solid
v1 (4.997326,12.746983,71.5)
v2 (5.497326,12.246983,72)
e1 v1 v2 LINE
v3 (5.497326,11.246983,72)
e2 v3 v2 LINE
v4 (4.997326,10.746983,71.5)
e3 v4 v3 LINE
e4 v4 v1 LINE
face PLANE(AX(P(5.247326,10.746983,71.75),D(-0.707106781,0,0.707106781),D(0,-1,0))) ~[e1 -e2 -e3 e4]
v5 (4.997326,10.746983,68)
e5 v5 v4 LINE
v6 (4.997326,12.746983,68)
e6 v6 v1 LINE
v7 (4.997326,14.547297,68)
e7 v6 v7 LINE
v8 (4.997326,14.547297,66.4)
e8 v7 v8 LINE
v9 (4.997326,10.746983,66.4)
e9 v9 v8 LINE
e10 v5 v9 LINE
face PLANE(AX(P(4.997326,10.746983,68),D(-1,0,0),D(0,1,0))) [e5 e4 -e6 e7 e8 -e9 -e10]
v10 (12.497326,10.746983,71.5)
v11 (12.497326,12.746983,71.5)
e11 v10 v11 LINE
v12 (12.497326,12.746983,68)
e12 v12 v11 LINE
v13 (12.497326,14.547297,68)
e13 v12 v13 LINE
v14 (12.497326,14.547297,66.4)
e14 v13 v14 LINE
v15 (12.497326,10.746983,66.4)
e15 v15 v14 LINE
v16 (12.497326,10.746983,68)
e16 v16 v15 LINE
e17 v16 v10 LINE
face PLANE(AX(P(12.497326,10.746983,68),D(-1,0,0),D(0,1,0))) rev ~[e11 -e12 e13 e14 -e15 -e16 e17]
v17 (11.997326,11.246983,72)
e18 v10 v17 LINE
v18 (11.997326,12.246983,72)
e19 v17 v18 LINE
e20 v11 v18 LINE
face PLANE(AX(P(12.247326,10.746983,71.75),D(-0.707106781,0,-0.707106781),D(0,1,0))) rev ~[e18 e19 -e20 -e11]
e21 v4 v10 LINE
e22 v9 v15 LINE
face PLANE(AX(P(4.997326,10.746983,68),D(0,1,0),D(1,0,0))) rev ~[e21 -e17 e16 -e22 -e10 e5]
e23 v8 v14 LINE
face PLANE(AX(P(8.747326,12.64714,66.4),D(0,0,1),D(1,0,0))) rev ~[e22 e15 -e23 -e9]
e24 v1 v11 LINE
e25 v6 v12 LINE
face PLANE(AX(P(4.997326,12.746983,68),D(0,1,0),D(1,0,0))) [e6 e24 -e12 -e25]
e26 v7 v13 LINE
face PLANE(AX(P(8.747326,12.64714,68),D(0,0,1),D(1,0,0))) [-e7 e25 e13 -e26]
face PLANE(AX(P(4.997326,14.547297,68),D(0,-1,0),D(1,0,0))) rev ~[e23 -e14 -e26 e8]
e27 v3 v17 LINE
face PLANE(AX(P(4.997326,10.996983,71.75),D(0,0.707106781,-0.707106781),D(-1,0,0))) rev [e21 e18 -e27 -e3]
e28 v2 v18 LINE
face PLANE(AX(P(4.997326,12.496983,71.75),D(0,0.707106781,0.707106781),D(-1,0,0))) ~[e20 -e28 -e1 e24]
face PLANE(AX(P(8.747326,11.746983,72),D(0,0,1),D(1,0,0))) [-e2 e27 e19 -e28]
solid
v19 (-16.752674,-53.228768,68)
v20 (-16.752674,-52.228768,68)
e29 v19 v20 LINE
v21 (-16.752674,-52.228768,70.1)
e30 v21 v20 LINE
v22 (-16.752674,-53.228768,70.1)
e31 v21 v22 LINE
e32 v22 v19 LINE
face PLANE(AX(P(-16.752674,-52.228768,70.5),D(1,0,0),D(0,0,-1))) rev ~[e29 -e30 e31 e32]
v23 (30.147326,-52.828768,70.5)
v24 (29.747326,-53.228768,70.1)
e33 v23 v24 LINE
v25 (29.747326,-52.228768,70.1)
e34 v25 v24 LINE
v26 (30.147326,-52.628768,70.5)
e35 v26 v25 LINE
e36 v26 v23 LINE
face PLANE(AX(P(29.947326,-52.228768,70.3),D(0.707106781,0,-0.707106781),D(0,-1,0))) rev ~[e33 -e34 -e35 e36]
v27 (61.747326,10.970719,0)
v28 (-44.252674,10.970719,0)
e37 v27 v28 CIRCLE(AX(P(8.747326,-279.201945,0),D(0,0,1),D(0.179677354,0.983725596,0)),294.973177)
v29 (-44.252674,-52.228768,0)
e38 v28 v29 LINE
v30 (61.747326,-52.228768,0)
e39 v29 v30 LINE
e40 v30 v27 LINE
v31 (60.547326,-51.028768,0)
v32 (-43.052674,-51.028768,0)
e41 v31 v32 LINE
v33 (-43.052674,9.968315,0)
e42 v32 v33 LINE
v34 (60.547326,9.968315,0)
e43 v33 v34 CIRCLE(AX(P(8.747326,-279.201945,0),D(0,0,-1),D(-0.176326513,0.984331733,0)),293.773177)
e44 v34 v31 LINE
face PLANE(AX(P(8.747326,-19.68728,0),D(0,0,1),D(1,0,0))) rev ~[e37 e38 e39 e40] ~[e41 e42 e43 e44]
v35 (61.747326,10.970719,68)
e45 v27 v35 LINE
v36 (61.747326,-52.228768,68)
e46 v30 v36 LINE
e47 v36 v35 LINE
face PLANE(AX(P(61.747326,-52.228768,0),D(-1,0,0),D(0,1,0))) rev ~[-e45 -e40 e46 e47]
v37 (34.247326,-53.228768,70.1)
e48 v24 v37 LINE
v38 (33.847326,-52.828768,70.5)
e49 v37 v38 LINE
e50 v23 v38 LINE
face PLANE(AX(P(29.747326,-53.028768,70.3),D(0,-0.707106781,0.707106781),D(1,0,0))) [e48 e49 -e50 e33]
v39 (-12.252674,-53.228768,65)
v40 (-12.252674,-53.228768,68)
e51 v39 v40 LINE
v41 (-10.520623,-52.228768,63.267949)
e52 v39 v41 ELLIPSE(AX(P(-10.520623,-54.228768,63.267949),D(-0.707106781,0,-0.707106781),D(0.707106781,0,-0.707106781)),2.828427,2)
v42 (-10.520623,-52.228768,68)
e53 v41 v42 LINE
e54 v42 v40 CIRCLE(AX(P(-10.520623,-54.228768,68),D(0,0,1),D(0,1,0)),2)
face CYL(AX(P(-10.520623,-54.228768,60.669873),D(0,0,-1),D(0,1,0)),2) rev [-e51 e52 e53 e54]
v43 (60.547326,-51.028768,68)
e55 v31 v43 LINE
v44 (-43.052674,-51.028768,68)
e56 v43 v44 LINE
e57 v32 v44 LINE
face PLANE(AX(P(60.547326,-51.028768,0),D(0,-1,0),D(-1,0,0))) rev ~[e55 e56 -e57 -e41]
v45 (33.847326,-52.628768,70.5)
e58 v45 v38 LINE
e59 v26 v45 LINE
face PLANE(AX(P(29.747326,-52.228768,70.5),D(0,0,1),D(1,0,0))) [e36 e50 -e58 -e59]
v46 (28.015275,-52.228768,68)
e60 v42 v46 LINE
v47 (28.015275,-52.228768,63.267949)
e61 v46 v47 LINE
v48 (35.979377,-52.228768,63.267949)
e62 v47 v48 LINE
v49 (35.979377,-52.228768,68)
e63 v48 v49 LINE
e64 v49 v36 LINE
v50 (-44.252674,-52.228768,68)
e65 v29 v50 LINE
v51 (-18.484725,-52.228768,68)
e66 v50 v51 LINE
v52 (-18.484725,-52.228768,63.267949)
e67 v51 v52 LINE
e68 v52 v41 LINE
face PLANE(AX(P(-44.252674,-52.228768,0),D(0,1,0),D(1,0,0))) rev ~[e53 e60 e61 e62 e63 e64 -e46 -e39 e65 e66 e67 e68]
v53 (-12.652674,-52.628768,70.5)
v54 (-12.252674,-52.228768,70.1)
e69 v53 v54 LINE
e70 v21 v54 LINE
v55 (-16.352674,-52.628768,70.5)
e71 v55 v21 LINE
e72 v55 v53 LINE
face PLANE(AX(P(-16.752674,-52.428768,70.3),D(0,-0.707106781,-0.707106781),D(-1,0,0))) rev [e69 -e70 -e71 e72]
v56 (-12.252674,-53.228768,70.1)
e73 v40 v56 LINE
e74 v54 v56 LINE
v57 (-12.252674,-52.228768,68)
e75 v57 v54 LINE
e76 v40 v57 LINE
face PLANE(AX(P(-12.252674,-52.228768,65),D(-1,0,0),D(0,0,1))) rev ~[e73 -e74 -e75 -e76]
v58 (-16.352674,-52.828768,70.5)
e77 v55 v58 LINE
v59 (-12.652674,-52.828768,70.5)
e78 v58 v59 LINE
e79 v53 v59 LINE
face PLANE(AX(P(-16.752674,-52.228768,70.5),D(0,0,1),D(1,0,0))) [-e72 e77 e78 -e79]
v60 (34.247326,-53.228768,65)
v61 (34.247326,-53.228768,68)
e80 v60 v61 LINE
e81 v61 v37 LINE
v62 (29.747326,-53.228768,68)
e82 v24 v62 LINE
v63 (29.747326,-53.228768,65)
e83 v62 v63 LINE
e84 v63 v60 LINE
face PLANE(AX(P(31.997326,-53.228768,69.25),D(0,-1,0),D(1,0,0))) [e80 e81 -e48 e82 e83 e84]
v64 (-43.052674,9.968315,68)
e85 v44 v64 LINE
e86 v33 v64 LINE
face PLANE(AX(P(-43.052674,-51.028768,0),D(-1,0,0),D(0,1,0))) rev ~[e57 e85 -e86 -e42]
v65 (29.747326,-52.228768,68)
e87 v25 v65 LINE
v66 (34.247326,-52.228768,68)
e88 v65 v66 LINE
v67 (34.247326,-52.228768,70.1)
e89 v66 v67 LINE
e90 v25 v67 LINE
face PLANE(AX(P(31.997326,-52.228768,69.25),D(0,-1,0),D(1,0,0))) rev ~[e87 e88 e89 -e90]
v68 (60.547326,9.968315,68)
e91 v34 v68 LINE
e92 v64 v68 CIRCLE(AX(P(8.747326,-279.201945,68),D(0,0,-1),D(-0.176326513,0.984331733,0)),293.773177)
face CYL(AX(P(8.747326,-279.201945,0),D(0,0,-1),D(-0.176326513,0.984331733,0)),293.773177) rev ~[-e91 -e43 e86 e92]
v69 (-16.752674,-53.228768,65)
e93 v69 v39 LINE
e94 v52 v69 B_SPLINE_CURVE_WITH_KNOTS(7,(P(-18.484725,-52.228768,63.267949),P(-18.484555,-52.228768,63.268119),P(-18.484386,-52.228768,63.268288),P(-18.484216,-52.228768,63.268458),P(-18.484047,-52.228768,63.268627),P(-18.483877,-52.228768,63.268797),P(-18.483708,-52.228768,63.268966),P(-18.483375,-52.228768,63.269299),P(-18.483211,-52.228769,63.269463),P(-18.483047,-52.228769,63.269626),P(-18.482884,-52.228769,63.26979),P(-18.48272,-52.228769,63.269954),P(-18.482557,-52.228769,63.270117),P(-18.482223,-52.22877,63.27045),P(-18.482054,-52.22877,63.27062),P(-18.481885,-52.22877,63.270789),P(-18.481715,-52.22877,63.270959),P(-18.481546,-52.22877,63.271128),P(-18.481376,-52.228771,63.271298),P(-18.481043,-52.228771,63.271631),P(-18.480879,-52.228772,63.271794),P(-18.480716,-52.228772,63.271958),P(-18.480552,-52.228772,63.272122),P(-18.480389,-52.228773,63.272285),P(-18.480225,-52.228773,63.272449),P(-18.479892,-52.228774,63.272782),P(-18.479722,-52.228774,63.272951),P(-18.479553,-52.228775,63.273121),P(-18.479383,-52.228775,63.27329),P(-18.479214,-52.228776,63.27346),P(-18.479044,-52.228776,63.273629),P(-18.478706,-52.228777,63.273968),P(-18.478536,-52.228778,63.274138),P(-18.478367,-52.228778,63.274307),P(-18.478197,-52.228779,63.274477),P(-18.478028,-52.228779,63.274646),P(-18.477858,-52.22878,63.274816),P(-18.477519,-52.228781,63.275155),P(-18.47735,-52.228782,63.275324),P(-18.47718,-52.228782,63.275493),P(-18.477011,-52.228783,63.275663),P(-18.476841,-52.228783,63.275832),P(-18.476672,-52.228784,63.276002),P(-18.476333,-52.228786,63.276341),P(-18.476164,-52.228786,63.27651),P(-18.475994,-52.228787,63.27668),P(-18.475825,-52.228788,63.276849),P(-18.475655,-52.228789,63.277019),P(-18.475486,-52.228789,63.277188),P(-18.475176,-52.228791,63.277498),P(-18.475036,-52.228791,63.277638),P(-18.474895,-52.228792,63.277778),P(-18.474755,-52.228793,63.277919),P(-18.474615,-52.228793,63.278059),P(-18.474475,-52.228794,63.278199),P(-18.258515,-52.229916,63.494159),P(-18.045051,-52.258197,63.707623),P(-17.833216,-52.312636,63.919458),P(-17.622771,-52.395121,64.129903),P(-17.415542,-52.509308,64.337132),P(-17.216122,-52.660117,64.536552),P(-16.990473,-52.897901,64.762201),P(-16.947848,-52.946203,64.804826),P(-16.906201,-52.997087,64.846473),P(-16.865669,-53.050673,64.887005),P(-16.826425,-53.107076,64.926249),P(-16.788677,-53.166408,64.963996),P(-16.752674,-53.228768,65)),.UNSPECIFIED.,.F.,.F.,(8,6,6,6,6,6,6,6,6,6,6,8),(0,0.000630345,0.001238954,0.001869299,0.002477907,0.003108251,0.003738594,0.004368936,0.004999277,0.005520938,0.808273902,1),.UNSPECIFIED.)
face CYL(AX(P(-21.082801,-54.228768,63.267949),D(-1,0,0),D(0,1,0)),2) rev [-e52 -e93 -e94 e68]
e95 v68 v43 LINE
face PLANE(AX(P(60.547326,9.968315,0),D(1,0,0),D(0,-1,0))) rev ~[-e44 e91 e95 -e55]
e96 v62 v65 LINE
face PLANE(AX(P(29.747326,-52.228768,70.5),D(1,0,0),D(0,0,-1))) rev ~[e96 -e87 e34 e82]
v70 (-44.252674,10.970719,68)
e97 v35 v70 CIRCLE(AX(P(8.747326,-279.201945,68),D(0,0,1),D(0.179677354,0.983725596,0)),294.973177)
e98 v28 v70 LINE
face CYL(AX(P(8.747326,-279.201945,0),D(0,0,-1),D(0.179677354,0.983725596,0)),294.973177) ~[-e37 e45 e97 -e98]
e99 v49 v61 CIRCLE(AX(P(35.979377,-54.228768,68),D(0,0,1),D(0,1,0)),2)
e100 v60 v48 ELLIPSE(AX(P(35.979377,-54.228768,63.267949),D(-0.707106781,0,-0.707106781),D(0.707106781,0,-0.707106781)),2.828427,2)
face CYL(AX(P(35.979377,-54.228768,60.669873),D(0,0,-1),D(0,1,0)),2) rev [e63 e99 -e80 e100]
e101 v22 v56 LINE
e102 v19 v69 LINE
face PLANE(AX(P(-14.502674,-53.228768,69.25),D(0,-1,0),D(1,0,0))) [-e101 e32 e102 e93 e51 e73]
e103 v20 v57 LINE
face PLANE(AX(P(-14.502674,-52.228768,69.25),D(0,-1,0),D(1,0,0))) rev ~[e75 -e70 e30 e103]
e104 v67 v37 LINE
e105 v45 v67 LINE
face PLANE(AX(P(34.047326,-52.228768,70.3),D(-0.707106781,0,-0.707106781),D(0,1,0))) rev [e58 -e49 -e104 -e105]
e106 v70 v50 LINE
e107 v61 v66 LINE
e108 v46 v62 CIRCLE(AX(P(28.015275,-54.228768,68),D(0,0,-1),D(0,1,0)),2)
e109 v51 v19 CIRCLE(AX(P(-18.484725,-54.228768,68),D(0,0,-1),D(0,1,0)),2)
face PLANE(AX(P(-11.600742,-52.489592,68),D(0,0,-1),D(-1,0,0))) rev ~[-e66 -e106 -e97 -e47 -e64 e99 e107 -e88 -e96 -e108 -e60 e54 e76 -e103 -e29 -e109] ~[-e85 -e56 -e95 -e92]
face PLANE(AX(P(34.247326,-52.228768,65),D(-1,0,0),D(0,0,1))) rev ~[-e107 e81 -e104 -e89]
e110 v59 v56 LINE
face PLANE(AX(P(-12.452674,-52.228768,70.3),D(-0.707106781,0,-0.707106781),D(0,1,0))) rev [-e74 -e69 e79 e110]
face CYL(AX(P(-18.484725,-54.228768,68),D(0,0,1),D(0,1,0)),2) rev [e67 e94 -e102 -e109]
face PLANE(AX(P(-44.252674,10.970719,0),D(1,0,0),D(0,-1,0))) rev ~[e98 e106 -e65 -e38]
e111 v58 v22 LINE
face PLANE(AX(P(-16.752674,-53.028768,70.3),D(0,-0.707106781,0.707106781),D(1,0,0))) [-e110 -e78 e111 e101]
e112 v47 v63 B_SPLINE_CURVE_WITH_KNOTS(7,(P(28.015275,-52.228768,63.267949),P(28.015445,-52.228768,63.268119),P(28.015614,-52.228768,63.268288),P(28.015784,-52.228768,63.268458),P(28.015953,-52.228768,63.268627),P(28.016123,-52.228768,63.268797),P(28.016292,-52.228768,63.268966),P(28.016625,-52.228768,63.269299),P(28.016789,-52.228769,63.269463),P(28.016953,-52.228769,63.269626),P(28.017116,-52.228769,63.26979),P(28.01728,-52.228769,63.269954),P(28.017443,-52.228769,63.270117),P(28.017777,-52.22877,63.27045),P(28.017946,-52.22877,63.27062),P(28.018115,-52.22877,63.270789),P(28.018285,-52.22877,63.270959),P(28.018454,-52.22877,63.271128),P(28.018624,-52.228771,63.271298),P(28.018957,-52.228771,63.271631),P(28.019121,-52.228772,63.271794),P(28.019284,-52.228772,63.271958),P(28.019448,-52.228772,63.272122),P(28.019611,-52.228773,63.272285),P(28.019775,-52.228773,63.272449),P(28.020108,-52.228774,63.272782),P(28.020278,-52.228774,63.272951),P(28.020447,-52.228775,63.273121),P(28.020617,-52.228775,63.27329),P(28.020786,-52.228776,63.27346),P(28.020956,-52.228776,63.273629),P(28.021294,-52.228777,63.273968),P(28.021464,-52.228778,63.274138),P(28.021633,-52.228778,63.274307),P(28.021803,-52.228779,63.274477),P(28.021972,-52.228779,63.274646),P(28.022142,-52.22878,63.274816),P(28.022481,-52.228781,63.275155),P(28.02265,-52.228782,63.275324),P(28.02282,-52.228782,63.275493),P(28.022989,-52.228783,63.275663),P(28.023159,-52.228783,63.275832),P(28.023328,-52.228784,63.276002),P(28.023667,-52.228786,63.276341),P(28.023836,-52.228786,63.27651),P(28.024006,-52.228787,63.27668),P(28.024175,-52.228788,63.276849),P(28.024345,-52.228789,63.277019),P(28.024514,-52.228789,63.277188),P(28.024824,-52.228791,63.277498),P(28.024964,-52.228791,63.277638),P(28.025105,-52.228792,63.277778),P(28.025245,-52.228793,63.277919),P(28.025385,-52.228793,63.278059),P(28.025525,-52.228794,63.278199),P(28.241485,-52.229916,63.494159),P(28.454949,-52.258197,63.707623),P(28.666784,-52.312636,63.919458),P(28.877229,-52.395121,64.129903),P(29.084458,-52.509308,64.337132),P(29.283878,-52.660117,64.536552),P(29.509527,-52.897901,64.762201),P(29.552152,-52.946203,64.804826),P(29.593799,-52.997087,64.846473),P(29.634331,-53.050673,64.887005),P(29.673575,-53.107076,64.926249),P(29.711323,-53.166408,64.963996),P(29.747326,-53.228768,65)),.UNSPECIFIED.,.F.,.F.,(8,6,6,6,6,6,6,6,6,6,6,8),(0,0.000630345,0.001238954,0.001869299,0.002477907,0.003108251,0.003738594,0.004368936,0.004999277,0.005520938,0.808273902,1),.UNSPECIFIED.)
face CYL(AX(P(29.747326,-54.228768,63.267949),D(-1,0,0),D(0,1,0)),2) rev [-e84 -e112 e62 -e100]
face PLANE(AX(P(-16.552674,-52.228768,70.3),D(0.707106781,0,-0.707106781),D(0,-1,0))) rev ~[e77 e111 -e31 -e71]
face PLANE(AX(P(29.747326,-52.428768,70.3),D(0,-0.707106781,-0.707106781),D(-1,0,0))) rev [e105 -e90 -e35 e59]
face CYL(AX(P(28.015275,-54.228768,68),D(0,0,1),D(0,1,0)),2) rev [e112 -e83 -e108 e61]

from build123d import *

# Parameters (mm, degrees)
F1_DEPTH     = 68
F2_W         = 4.5
F2_H         = 2.5
F2_H_2       = 3
F3_DEPTH     = 1
F4_T1_DEPTH  = 3
F4_T3_DEPTH  = 4.5
F4_T5_DEPTH  = 4.5
F4_T11_DEPTH = 7.3301270189
F4_T15_DEPTH = 8.8301270189
F4_T22_DEPTH = 8.8301270189
F4_T26_DEPTH = 7.3301270189
F4_T33_DEPTH = 8.8301270189
F4_T37_DEPTH = 7.3301270189
F4_T44_DEPTH = 7.3301270189
F4_T48_DEPTH = 8.8301270189
F5_W         = 7.5
F5_H         = 3.8003136895
F6_DEPTH     = 1.6
F7_W         = 7.5
F7_H         = 2
F8_DEPTH     = 4
F9_SIZE      = 0.5
F10_SIZE     = 0.4


# Not quite as in the source:
# - a fillet or chamfer that OpenCascade refuses, or shapes differently, is made with other operations: its cross-section is extruded or revolved along the edge and cut away or added


with BuildPart() as f1:
    # F0 (on Top) → F1 (new body)
    with BuildSketch(Plane.XY):
        with BuildLine():
            ThreePointArc((61.7473262101, 10.9707194196), (8.7473262101, 15.7712320468), (-44.2526737899, 10.9707194196))
            Line((-44.2526737899, 10.9707194196), (-44.2526737899, -52.2287679532))
            Line((-44.2526737899, -52.2287679532), (61.7473262101, -52.2287679532))
            Line((61.7473262101, -52.2287679532), (61.7473262101, 10.9707194196))
        make_face()
        with BuildLine():
            ThreePointArc((-43.0526737899, 9.9683154894), (8.7473262101, 14.5712320468), (60.5473262101, 9.9683154894))
            Line((60.5473262101, 9.9683154894), (60.5473262101, -51.0287679532))
            Line((60.5473262101, -51.0287679532), (-43.0526737899, -51.0287679532))
            Line((-43.0526737899, -51.0287679532), (-43.0526737899, 9.9683154894))
        make_face(mode=Mode.SUBTRACT)
    extrude(amount=F1_DEPTH)

    # F2 (on face) → F3 (join)
    with BuildSketch(Plane.XZ.offset(52.2287679532)):
        with Locations((-14.5026737899, 69.25)):
            Rectangle(F2_W, F2_H)
        with Locations((31.9973262101, 69.25)):
            Rectangle(F2_W, F2_H)
        with Locations((-14.5026737899, 66.5)):
            Rectangle(F2_W, F2_H_2)
        with Locations((31.9973262101, 66.5)):
            Rectangle(F2_W, F2_H_2)
    extrude(amount=F3_DEPTH)

    # F4: fillet of radius 2 on 6 edges, made by hand

    # F4_s2 → F4_t1 (join)
    with BuildSketch(Plane.XY.offset(65)):
        with BuildLine():
            ThreePointArc((-10.5206229823, -52.2287679532), (-11.5206229823, -52.4967171456), (-12.2526737899, -53.2287679532))
            Line((-12.2526737899, -53.2287679532), (-12.2526737899, -52.2287679532))
            Line((-12.2526737899, -52.2287679532), (-10.5206229823, -52.2287679532))
        make_face()
        with BuildLine():
            ThreePointArc((-18.4847245974, -52.2287679532), (-17.4847245974, -52.4967171456), (-16.7526737899, -53.2287679532))
            Line((-16.7526737899, -53.2287679532), (-16.7526737899, -52.2287679532))
            Line((-16.7526737899, -52.2287679532), (-18.4847245974, -52.2287679532))
        make_face()
        with BuildLine():
            ThreePointArc((28.0152754026, -52.2287679532), (29.0152754026, -52.4967171456), (29.7473262101, -53.2287679532))
            Line((29.7473262101, -53.2287679532), (29.7473262101, -52.2287679532))
            Line((29.7473262101, -52.2287679532), (28.0152754026, -52.2287679532))
        make_face()
        with BuildLine():
            ThreePointArc((35.9793770177, -52.2287679532), (34.9793770177, -52.4967171456), (34.2473262101, -53.2287679532))
            Line((34.2473262101, -53.2287679532), (34.2473262101, -52.2287679532))
            Line((34.2473262101, -52.2287679532), (35.9793770177, -52.2287679532))
        make_face()
    extrude(amount=F4_T1_DEPTH)

    # F4_s4 → F4_t3 (join)
    with BuildSketch(Plane.YZ.offset(-16.7526737899)):
        with BuildLine():
            ThreePointArc((-52.2287679532, 63.2679491924), (-52.4967171456, 64.2679491924), (-53.2287679532, 65))
            Line((-53.2287679532, 65), (-52.2287679532, 65))
            Line((-52.2287679532, 65), (-52.2287679532, 63.2679491924))
        make_face()
    extrude(amount=F4_T3_DEPTH)

    # F4_s6 → F4_t5 (join)
    with BuildSketch(Plane.YZ.offset(29.7473262101)):
        with BuildLine():
            ThreePointArc((-52.2287679532, 63.2679491924), (-52.4967171456, 64.2679491924), (-53.2287679532, 65))
            Line((-53.2287679532, 65), (-52.2287679532, 65))
            Line((-52.2287679532, 65), (-52.2287679532, 63.2679491924))
        make_face()
    extrude(amount=F4_T5_DEPTH)


with BuildPart() as f4_tool9:
    # F4_s10 → F4_t11 (new body)
    with BuildSketch(Plane.XY.offset(60.6698729811)):
        with BuildLine():
            ThreePointArc((-10.5206229823, -52.2287679532), (-11.5206229823, -52.4967171456), (-12.2526737899, -53.2287679532))
            Line((-12.2526737899, -53.2287679532), (-12.2526737899, -52.2287679532))
            Line((-12.2526737899, -52.2287679532), (-10.5206229823, -52.2287679532))
        make_face()
    extrude(amount=F4_T11_DEPTH)

    split(bisect_by=Plane.XY.offset(65), keep=Keep.BOTTOM)


with BuildPart() as f4_tool13:
    # F4_s14 → F4_t15 (new body)
    with BuildSketch(Plane.YZ.offset(-16.7526737899)):
        with BuildLine():
            ThreePointArc((-52.2287679532, 63.2679491924), (-52.4967171456, 64.2679491924), (-53.2287679532, 65))
            Line((-53.2287679532, 65), (-52.2287679532, 65))
            Line((-52.2287679532, 65), (-52.2287679532, 63.2679491924))
        make_face()
    extrude(amount=F4_T15_DEPTH)

    split(bisect_by=Plane.YZ.offset(-12.2526737899), keep=Keep.TOP)


with BuildPart() as f4_tool9_1:
    add(f4_tool9.part)

    # F4_t17: intersect F4_tool13
    add(f4_tool13.part, mode=Mode.INTERSECT)


with BuildPart() as f1_1:
    add(f1.part)

    # F4_t7: union F4_tool9
    add(f4_tool9_1.part)


with BuildPart() as f4_tool20:
    # F4_s21 → F4_t22 (new body)
    with BuildSketch(Plane.YZ.offset(-21.0828008088)):
        with BuildLine():
            ThreePointArc((-52.2287679532, 63.2679491924), (-52.4967171456, 64.2679491924), (-53.2287679532, 65))
            Line((-53.2287679532, 65), (-52.2287679532, 65))
            Line((-52.2287679532, 65), (-52.2287679532, 63.2679491924))
        make_face()
    extrude(amount=F4_T22_DEPTH)

    split(bisect_by=Plane.YZ.offset(-16.7526737899), keep=Keep.BOTTOM)


with BuildPart() as f4_tool24:
    # F4_s25 → F4_t26 (new body)
    with BuildSketch(Plane.XY.offset(68)):
        with BuildLine():
            ThreePointArc((-18.4847245974, -52.2287679532), (-17.4847245974, -52.4967171456), (-16.7526737899, -53.2287679532))
            Line((-16.7526737899, -53.2287679532), (-16.7526737899, -52.2287679532))
            Line((-16.7526737899, -52.2287679532), (-18.4847245974, -52.2287679532))
        make_face()
    extrude(amount=-F4_T26_DEPTH)

    split(bisect_by=Plane.XY.offset(65), keep=Keep.BOTTOM)


with BuildPart() as f4_tool20_1:
    add(f4_tool20.part)

    # F4_t28: intersect F4_tool24
    add(f4_tool24.part, mode=Mode.INTERSECT)


with BuildPart() as f1_2:
    add(f1_1.part)

    # F4_t18: union F4_tool20
    add(f4_tool20_1.part)


with BuildPart() as f4_tool31:
    # F4_s32 → F4_t33 (new body)
    with BuildSketch(Plane.YZ.offset(25.4171991912)):
        with BuildLine():
            ThreePointArc((-52.2287679532, 63.2679491924), (-52.4967171456, 64.2679491924), (-53.2287679532, 65))
            Line((-53.2287679532, 65), (-52.2287679532, 65))
            Line((-52.2287679532, 65), (-52.2287679532, 63.2679491924))
        make_face()
    extrude(amount=F4_T33_DEPTH)

    split(bisect_by=Plane.YZ.offset(29.7473262101), keep=Keep.BOTTOM)


with BuildPart() as f4_tool35:
    # F4_s36 → F4_t37 (new body)
    with BuildSketch(Plane.XY.offset(68)):
        with BuildLine():
            ThreePointArc((28.0152754026, -52.2287679532), (29.0152754026, -52.4967171456), (29.7473262101, -53.2287679532))
            Line((29.7473262101, -53.2287679532), (29.7473262101, -52.2287679532))
            Line((29.7473262101, -52.2287679532), (28.0152754026, -52.2287679532))
        make_face()
    extrude(amount=-F4_T37_DEPTH)

    split(bisect_by=Plane.XY.offset(65), keep=Keep.BOTTOM)


with BuildPart() as f4_tool31_1:
    add(f4_tool31.part)

    # F4_t39: intersect F4_tool35
    add(f4_tool35.part, mode=Mode.INTERSECT)


with BuildPart() as f1_3:
    add(f1_2.part)

    # F4_t29: union F4_tool31
    add(f4_tool31_1.part)


with BuildPart() as f4_tool42:
    # F4_s43 → F4_t44 (new body)
    with BuildSketch(Plane.XY.offset(60.6698729811)):
        with BuildLine():
            ThreePointArc((35.9793770177, -52.2287679532), (34.9793770177, -52.4967171456), (34.2473262101, -53.2287679532))
            Line((34.2473262101, -53.2287679532), (34.2473262101, -52.2287679532))
            Line((34.2473262101, -52.2287679532), (35.9793770177, -52.2287679532))
        make_face()
    extrude(amount=F4_T44_DEPTH)

    split(bisect_by=Plane.XY.offset(65), keep=Keep.BOTTOM)


with BuildPart() as f4_tool46:
    # F4_s47 → F4_t48 (new body)
    with BuildSketch(Plane.YZ.offset(29.7473262101)):
        with BuildLine():
            ThreePointArc((-52.2287679532, 63.2679491924), (-52.4967171456, 64.2679491924), (-53.2287679532, 65))
            Line((-53.2287679532, 65), (-52.2287679532, 65))
            Line((-52.2287679532, 65), (-52.2287679532, 63.2679491924))
        make_face()
    extrude(amount=F4_T48_DEPTH)

    split(bisect_by=Plane.YZ.offset(34.2473262101), keep=Keep.TOP)


with BuildPart() as f4_tool42_1:
    add(f4_tool42.part)

    # F4_t50: intersect F4_tool46
    add(f4_tool46.part, mode=Mode.INTERSECT)


with BuildPart() as f1_4:
    add(f1_3.part)

    # F4_t40: union F4_tool42
    add(f4_tool42_1.part)

    # F10
    f10_edges = [f1_4.edges().sort_by_distance(p)[0] for p in [
        (31.997326, -52.228768, 70.5),
        (29.747326, -52.728768, 70.5),
        (31.997326, -53.228768, 70.5),
        (34.247326, -52.728768, 70.5),
        (-14.502674, -52.228768, 70.5),
        (-16.752674, -52.728768, 70.5),
        (-12.252674, -52.728768, 70.5),
        (-14.502674, -53.228768, 70.5),
    ]]
    chamfer(f10_edges, length=F10_SIZE)


with BuildPart() as f6:
    # F5 (on face) → F6 (new body)
    with BuildSketch(Plane.XY.offset(68)):
        with Locations((8.7473262101, 12.6471399452)):
            Rectangle(F5_W, F5_H)
    extrude(amount=-F6_DEPTH)

    # F7 (on face) → F8 (join)
    with BuildSketch(Plane.XY.offset(68)):
        with Locations((8.7473262101, 11.7469831005)):
            Rectangle(F7_W, F7_H)
    extrude(amount=F8_DEPTH)

    # F9
    f9_edges = [f6.edges().sort_by_distance(p)[0] for p in [
        (4.997326, 11.746983, 72),
        (8.747326, 10.746983, 72),
        (8.747326, 12.746983, 72),
        (12.497326, 11.746983, 72),
    ]]
    chamfer(f9_edges, length=F9_SIZE)


solid = Compound([f1_4.part, f6.part])
